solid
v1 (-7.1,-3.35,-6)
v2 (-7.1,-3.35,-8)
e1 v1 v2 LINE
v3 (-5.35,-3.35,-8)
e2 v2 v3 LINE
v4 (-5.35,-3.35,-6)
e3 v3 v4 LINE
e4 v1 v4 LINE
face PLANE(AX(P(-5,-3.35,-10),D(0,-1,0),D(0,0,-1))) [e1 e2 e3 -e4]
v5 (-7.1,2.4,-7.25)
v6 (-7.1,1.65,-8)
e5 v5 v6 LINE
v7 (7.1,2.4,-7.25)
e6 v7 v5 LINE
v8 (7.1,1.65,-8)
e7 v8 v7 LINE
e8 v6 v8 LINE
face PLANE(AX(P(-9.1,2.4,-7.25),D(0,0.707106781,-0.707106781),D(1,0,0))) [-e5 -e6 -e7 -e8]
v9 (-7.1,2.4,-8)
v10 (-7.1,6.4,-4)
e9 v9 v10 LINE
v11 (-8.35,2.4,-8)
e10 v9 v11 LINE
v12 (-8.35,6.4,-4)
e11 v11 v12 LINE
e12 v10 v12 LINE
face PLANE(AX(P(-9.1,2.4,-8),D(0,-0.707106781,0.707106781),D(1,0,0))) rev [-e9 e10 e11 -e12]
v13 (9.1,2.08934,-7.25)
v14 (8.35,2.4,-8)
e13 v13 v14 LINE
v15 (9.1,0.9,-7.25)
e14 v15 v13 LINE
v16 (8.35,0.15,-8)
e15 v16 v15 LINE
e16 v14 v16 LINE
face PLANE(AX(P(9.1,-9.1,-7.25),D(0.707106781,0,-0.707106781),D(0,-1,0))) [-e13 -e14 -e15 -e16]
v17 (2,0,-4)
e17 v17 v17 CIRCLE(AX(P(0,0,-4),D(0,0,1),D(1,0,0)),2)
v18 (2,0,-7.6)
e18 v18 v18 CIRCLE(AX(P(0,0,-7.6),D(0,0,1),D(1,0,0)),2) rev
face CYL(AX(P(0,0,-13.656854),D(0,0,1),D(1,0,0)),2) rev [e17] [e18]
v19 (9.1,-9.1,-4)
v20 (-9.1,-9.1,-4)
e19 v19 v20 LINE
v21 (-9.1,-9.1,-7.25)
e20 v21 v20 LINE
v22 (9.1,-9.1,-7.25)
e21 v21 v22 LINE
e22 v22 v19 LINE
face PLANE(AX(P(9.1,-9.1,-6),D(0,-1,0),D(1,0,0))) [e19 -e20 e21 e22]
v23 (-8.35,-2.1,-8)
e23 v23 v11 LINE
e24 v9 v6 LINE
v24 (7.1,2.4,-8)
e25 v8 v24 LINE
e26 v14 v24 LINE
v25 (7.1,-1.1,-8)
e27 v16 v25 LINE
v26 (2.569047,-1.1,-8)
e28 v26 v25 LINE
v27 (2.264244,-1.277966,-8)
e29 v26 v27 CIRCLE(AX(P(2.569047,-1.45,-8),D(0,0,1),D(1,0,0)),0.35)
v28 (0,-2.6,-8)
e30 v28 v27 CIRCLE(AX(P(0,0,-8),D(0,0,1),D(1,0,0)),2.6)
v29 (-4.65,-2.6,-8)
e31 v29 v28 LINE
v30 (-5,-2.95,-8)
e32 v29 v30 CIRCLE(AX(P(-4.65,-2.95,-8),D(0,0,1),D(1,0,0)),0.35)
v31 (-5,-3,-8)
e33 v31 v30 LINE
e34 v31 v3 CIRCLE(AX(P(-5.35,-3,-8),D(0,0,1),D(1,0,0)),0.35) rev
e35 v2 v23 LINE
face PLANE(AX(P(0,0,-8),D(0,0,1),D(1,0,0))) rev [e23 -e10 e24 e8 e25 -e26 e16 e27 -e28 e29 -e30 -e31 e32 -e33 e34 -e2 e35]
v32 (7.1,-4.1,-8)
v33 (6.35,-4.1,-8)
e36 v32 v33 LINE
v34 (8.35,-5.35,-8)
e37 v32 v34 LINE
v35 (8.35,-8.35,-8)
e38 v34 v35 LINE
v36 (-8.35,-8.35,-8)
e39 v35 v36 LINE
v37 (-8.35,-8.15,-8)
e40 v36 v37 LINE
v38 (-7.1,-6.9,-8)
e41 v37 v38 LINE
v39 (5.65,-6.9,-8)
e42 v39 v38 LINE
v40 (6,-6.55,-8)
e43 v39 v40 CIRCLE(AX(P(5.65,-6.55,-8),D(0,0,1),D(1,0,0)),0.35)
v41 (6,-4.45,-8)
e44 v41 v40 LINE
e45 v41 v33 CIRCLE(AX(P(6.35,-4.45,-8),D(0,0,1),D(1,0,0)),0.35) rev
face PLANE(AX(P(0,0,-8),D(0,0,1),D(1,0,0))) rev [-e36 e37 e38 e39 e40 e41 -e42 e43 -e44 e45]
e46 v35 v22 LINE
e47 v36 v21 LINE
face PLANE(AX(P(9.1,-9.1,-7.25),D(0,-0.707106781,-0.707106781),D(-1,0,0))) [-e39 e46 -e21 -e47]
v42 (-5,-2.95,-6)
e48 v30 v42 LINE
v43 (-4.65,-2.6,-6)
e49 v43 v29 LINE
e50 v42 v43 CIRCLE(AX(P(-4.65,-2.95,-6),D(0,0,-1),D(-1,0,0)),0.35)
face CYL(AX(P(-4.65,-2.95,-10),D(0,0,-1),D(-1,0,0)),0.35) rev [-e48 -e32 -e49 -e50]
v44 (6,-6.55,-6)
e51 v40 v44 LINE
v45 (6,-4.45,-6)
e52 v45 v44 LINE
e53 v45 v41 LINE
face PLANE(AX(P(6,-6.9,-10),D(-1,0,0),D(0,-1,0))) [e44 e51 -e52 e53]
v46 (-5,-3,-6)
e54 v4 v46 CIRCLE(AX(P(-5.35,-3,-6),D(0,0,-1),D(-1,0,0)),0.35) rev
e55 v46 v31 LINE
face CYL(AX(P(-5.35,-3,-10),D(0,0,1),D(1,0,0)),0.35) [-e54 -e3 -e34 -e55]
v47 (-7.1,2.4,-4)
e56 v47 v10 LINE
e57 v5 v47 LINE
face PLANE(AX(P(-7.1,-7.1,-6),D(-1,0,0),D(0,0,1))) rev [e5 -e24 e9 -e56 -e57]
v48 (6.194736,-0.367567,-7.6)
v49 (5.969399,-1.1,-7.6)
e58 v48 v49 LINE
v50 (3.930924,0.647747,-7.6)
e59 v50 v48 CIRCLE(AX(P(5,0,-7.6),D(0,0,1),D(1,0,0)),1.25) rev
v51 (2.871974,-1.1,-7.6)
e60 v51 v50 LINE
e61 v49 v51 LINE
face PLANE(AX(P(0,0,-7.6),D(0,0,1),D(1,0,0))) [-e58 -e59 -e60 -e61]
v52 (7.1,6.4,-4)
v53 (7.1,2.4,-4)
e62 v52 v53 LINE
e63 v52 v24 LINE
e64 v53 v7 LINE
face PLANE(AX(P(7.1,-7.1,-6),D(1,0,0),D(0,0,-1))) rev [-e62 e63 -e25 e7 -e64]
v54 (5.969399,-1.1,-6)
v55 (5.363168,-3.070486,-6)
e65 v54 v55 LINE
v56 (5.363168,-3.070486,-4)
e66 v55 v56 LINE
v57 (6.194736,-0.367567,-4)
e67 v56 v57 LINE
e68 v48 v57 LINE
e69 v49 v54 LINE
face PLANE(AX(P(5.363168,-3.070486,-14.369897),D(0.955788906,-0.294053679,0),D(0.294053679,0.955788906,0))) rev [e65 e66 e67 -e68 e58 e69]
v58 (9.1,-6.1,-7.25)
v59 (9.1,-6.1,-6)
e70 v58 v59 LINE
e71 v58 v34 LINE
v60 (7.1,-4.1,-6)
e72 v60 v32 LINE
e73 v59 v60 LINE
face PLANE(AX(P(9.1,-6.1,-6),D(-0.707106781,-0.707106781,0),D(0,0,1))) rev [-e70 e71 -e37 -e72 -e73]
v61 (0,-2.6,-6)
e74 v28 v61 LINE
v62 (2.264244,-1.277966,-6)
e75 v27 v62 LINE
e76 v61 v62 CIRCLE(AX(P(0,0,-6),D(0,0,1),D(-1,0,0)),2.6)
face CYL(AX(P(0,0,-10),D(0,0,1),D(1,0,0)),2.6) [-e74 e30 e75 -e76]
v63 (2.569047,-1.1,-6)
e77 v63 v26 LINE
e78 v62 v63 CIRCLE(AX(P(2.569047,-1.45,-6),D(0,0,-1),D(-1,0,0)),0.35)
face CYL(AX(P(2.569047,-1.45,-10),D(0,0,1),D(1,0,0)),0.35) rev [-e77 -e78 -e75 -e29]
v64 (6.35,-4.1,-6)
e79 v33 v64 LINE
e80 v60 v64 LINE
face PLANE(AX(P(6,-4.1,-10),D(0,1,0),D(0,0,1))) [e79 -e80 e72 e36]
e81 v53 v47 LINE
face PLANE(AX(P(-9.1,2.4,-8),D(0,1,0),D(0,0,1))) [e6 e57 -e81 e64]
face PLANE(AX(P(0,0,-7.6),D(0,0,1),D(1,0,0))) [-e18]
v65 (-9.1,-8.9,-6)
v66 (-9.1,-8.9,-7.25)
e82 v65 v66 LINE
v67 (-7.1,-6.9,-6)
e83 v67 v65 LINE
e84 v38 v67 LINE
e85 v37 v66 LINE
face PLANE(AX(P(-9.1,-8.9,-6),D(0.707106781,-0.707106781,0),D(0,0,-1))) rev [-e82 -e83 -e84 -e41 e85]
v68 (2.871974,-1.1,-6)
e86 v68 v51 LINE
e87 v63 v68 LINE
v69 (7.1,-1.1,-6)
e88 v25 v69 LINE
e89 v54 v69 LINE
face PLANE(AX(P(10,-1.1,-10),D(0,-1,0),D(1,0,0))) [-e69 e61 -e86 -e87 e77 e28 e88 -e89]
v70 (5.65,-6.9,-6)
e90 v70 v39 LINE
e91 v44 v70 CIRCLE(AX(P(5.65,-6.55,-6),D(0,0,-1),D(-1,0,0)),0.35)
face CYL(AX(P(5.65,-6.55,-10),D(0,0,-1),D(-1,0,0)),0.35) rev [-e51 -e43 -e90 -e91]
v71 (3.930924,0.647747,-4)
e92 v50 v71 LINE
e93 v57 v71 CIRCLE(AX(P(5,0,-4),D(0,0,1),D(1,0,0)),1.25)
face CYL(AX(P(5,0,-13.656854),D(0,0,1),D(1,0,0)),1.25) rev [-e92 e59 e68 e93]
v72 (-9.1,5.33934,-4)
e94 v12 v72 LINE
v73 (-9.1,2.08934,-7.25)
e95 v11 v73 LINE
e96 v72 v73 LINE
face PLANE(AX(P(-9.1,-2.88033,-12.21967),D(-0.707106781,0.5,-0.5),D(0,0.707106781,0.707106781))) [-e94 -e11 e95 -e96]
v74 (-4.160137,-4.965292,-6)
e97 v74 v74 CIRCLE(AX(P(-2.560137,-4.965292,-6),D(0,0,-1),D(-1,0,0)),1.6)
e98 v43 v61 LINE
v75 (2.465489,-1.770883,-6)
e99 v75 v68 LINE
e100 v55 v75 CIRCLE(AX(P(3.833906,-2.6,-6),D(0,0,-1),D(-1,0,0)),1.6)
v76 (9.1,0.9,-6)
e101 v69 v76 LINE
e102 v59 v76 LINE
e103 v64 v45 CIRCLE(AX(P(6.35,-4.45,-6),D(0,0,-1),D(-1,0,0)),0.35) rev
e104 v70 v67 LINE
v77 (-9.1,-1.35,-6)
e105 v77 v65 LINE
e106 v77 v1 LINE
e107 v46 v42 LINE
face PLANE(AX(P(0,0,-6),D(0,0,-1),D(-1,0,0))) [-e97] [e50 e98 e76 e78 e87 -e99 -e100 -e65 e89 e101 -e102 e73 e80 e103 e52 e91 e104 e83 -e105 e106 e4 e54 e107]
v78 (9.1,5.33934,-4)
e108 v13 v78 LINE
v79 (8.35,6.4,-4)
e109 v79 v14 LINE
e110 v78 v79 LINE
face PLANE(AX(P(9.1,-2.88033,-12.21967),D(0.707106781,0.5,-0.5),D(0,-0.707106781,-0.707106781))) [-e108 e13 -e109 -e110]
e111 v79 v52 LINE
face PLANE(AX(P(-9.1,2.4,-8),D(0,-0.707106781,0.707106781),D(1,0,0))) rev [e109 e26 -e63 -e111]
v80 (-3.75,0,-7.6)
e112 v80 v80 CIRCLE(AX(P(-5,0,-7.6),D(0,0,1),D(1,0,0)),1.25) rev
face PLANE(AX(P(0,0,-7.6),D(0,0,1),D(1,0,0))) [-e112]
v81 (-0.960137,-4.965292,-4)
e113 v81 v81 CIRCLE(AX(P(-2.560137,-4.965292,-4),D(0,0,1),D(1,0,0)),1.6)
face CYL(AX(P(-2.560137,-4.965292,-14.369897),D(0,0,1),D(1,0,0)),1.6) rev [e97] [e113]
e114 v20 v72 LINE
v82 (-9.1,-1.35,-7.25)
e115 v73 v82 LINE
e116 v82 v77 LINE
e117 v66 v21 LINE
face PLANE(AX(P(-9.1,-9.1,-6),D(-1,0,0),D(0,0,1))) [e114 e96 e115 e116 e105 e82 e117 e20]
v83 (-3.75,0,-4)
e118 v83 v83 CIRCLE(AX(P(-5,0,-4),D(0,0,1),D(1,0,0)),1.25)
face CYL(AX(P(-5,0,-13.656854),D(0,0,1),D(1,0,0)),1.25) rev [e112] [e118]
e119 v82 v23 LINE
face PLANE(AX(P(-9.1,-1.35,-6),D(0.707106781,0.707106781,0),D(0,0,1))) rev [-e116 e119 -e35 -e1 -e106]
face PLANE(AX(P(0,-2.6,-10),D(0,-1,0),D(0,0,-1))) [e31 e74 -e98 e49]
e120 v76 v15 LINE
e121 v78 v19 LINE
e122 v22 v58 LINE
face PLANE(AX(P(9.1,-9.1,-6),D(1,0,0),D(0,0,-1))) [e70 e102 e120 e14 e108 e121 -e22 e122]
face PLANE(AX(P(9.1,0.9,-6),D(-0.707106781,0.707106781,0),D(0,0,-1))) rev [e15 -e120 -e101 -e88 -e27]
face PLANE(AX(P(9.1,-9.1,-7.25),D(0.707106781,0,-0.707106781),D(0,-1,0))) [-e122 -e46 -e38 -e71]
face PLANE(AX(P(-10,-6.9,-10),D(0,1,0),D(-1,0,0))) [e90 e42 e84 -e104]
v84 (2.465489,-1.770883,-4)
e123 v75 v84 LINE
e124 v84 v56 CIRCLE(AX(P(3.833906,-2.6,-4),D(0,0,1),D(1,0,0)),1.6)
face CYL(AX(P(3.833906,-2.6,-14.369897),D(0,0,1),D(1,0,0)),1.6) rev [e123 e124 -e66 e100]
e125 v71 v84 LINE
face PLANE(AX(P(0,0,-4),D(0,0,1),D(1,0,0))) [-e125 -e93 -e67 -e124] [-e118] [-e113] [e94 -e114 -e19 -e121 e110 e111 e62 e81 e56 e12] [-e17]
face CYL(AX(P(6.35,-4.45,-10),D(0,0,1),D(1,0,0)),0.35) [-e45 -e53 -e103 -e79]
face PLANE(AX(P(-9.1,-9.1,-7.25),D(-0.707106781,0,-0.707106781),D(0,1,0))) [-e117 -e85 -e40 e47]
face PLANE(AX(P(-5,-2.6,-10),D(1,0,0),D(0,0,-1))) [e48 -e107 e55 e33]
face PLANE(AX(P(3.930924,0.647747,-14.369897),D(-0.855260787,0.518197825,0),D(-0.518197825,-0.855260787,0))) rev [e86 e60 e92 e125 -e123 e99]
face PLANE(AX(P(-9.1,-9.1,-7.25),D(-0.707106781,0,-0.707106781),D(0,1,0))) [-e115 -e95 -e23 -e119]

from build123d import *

# Parameters (mm, degrees)
OUTER_FRAME_EXTRUDE_DEPTH      = 4
OUTER_FRAME_EXTRUDE_DEPTH_BACK = 2
OUTSIDE_FRAME_W                = 18.2
OUTSIDE_FRAME_H                = 18.2
OUTSIDE_FRAME_W_2              = 14.2
OUTSIDE_FRAME_H_2              = 14.2
HOTSWAP_BASE_W                 = 18.2
HOTSWAP_BASE_H                 = 11.5
HOTSWAP_BASE_BLOCK_DEPTH       = 4
CUT_EXTRUDE4_DEPTH             = 16.15321748
CUT_EXTRUDE4_DEPTH_BACK        = 16.15321748
SKETCH1_W                      = 2
SKETCH1_H                      = 6.7
CUT_EXTRUDE1_DEPTH             = 4
SWITCH_PIN_HOLES_R             = 2
SWITCH_PIN_HOLES_R_2           = 1.25
SWITCH_HOLES_DEPTH             = 3.6
CUT_EXTRUDE3_REACH             = 17.153
HOTSWAP_HOLES_R                = 1.6
CHAMFER1_SIZE                  = 2
CHAMFER2_SIZE                  = 4
FILLET1_R                      = 0.35
CHAMFER3_SIZE                  = 0.75


# Some blends are built 0.0001 mm under size
with BuildPart() as part:
    # Outside Frame → Outer Frame Extrude (new, two sides: drawn at the far end of the back side and taken through both)
    with BuildSketch(Plane.XY.offset(-4).offset(-OUTER_FRAME_EXTRUDE_DEPTH_BACK)):
        Rectangle(OUTSIDE_FRAME_W, OUTSIDE_FRAME_H)
        Rectangle(OUTSIDE_FRAME_W_2, OUTSIDE_FRAME_H_2, mode=Mode.SUBTRACT)
    extrude(amount=OUTER_FRAME_EXTRUDE_DEPTH + OUTER_FRAME_EXTRUDE_DEPTH_BACK)

    # Hotswap Base → Hotswap Base Block (add)
    with BuildSketch(Plane.XY.offset(-4)):
        with Locations((0, -3.35)):
            Rectangle(HOTSWAP_BASE_W, HOTSWAP_BASE_H)
    extrude(amount=-HOTSWAP_BASE_BLOCK_DEPTH)

    # Sketch1 → Cut-Extrude4 (cut, two sides: drawn at the far end of the back side and taken through both)
    with BuildSketch(Plane(origin=(0, 0, 0), x_dir=(0, 0, -1), z_dir=(1, 0, 0)).offset(-CUT_EXTRUDE4_DEPTH_BACK)):
        with Locations((5, 5.75)):
            Rectangle(SKETCH1_W, SKETCH1_H)
    extrude(amount=CUT_EXTRUDE4_DEPTH + CUT_EXTRUDE4_DEPTH_BACK, mode=Mode.SUBTRACT)

    # Hotswap Well → Cut-Extrude1 (cut)
    with BuildSketch(Plane(origin=(0, 0, -6), x_dir=(-1, 0, 0), z_dir=(0, 0, -1))):
        with BuildLine():
            Line((-10, -1.1), (-2.355843798, -1.1))
            ThreePointArc((-2.355843798, -1.1), (-1.396424004, -2.19317122), (0, -2.6))
            Line((0, -2.6), (5, -2.6))
            Line((5, -2.6), (5, -3.35))
            Line((5, -3.35), (10, -3.35))
            Line((10, -3.35), (10, -6.9))
            Line((10, -6.9), (-6, -6.9))
            Line((-6, -6.9), (-6, -4.1))
            Line((-6, -4.1), (-10, -4.1))
            Line((-10, -4.1), (-10, -1.1))
        make_face()
    extrude(amount=CUT_EXTRUDE1_DEPTH, mode=Mode.SUBTRACT)

    # Switch Pin Holes → Switch Holes (cut)
    with BuildSketch(Plane.XY.offset(-4)):
        Circle(SWITCH_PIN_HOLES_R)
        with Locations((-5, 0)):
            Circle(SWITCH_PIN_HOLES_R_2)
        with Locations((5, 0)):
            Circle(SWITCH_PIN_HOLES_R_2)
    extrude(amount=-SWITCH_HOLES_DEPTH, mode=Mode.SUBTRACT)

    # Cut-Extrude3: up to this face of the body (flat: up to its plane)
    cut_extrude3_end = Plane(part.part.faces().sort_by_distance((5, 0.029137252, -7.6))[0])
    # Hotswap Holes → Cut-Extrude3 (cut, up to the picked face)
    with BuildSketch(Plane.XY, mode=Mode.PRIVATE) as cut_extrude3_sk1:
        with Locations((-2.560136595, -4.965291588)):
            Circle(HOTSWAP_HOLES_R)
    cut_extrude3_tool1 = split(extrude(cut_extrude3_sk1.sketch, amount=-CUT_EXTRUDE3_REACH, mode=Mode.PRIVATE), bisect_by=cut_extrude3_end, keep=Keep.BOTH, mode=Mode.PRIVATE)
    # Hotswap Holes → Cut-Extrude3 (cut, up to the picked face)
    with BuildSketch(Plane.XY, mode=Mode.PRIVATE) as cut_extrude3_sk2:
        with BuildLine():
            Line((3.930924016, 0.647747281), (2.46548889, -1.77088348))
            ThreePointArc((2.46548889, -1.77088348), (3.179147124, -4.059894044), (5.3631684, -3.070485887))
            Line((5.3631684, -3.070485887), (6.194736133, -0.367567099))
            ThreePointArc((6.194736133, -0.367567099), (5.511530489, 1.140542222), (3.930924016, 0.647747281))
        make_face()
    cut_extrude3_tool2 = split(extrude(cut_extrude3_sk2.sketch, amount=-CUT_EXTRUDE3_REACH, mode=Mode.PRIVATE), bisect_by=cut_extrude3_end, keep=Keep.BOTH, mode=Mode.PRIVATE)
    add(cut_extrude3_tool1.solids().sort_by(Axis((-2.560137, -4.965292, 0), (0, 0, -1)))[0], mode=Mode.SUBTRACT)
    add(cut_extrude3_tool2.solids().sort_by(Axis((4.301523, -1.557372, 0), (0, 0, -1)))[0], mode=Mode.SUBTRACT)

    # Chamfer1
    chamfer1_edges = [part.edges().sort_by_distance(p)[0] for p in [
        (9.1, -4.1, -7),
        (-9.1, -6.9, -7),
        (-9.1, -3.35, -7),
        (9.1, -1.1, -7),
    ]]
    chamfer(chamfer1_edges, length=CHAMFER1_SIZE)

    # Chamfer2
    chamfer2_edges = [part.edges().sort_by_distance(p)[0] for p in [
        (-8.1, 2.4, -4),
        (8.1, 2.4, -4),
    ]]
    chamfer(chamfer2_edges, length=CHAMFER2_SIZE - 0.0001)  # a hair under: the kernel refuses the full size

    # Fillet1
    fillet1_edges = [part.edges().sort_by_distance(p)[0] for p in [
        (6, -4.1, -7),
        (-5, -3.35, -7),
        (-5, -2.6, -7),
        (6, -6.9, -7),
        (2.355843798, -1.1, -7),
    ]]
    fillet(fillet1_edges, radius=FILLET1_R)

    # Chamfer3
    # the kernel refuses this chamfer: 0.75 mm, written as the material it takes off along each edge
    with BuildSketch(Plane(origin=(9.1, 4.328762241, -8), x_dir=(-0.9996219169112965, 0, -0.02749587661058676), z_dir=(0, -1, 0))) as chamfer3_piece_1:
        Polygon((CHAMFER3_SIZE * 0.999621916911, -CHAMFER3_SIZE * 0.0274958766106), (-CHAMFER3_SIZE * 0.0274958766106, -CHAMFER3_SIZE * 0.999621916911), (0, 0), align=None)
    extrude(amount=5.357524482, mode=Mode.SUBTRACT)
    with BuildSketch(Plane(origin=(-9.1, -3.278762241, -8), x_dir=(0.9996219169112965, 0, -0.02749587661058676), z_dir=(0, 1, 0))) as chamfer3_piece_2:
        Polygon((CHAMFER3_SIZE * 0.999621916911, -CHAMFER3_SIZE * 0.0274958766106), (-CHAMFER3_SIZE * 0.0274958766106, -CHAMFER3_SIZE * 0.999621916911), (0, 0), align=None)
    extrude(amount=7.607524482, mode=Mode.SUBTRACT)
    with BuildSketch(Plane(origin=(-9.1, -11.028762241, -8), x_dir=(-0.027495876610586768, 0, 0.9996219169112968), z_dir=(0, 1, 0))) as chamfer3_piece_3:
        Polygon((CHAMFER3_SIZE * 0.999621916911, CHAMFER3_SIZE * 0.0274958766106), (-CHAMFER3_SIZE * 0.0274958766106, CHAMFER3_SIZE * 0.999621916911), (0, 0), align=None)
    extrude(amount=4.057524482, mode=Mode.SUBTRACT)
    with BuildSketch(Plane(origin=(9.1, -4.171237759, -8), x_dir=(0.027495876610586768, 0, 0.9996219169112968), z_dir=(0, -1, 0))) as chamfer3_piece_4:
        Polygon((CHAMFER3_SIZE * 0.999621916911, CHAMFER3_SIZE * 0.0274958766106), (-CHAMFER3_SIZE * 0.0274958766106, CHAMFER3_SIZE * 0.999621916911), (0, 0), align=None)
    extrude(amount=6.857524482, mode=Mode.SUBTRACT)
    with BuildSketch(Plane(origin=(11.028762241, -9.1, -8), x_dir=(0, -0.027495876610586768, 0.9996219169112968), z_dir=(-1, 0, 0))) as chamfer3_piece_5:
        Polygon((CHAMFER3_SIZE * 0.999621916911, CHAMFER3_SIZE * 0.0274958766106), (-CHAMFER3_SIZE * 0.0274958766106, CHAMFER3_SIZE * 0.999621916911), (0, 0), align=None)
    extrude(amount=22.057524482, mode=Mode.SUBTRACT)
    with BuildSketch(Plane(origin=(-11.028762241, 2.4, -8), x_dir=(0, -0.9996219169112968, -0.027495876610586775), z_dir=(1, 0, 0))) as chamfer3_piece_6_section:
        Polygon((CHAMFER3_SIZE * 0.999621916911, -CHAMFER3_SIZE * 0.0274958766106), (-CHAMFER3_SIZE * 0.0274958766106, -CHAMFER3_SIZE * 0.999621916911), (0, 0), align=None)
    chamfer3_piece_6 = extrude(amount=22.057524482, mode=Mode.PRIVATE)
    chamfer3_piece_6 = split(chamfer3_piece_6, bisect_by=Plane(origin=(7.1, 2.149999996, -7.749999996), z_dir=(-1, 0, 0)), keep=Keep.TOP, mode=Mode.PRIVATE)
    chamfer3_piece_6 = split(chamfer3_piece_6, bisect_by=Plane(origin=(-7.1, 2.149999996, -7.749999996), z_dir=(1, 0, 0)), keep=Keep.TOP, mode=Mode.PRIVATE)
    add(chamfer3_piece_6, mode=Mode.SUBTRACT)
    with BuildSketch(Plane(origin=(9.1, 7.76374086, -2.63615914), x_dir=(0.02749587661058679, -0.7068394360706739, 0.706839436070673), z_dir=(0, -0.7071067811865471, -0.7071067811865479))) as chamfer3_piece_7_section:
        Polygon((CHAMFER3_SIZE * 0.999621916911, CHAMFER3_SIZE * 0.0274958766106), (-CHAMFER3_SIZE * 0.0274958766106, CHAMFER3_SIZE * 0.999621916911), (0, 0), align=None)
    chamfer3_piece_7 = extrude(amount=9.51423731, mode=Mode.PRIVATE)
    chamfer3_piece_7 = split(chamfer3_piece_7, bisect_by=Plane(origin=(8.843939938, 4.231743527, -4), z_dir=(0, 0, -1)), keep=Keep.TOP, mode=Mode.PRIVATE)
    add(chamfer3_piece_7, mode=Mode.SUBTRACT)
    with BuildSketch(Plane(origin=(-9.1, 7.76374086, -2.63615914), x_dir=(-0.027495876610586768, -0.7068394360706739, 0.706839436070673), z_dir=(0, -0.7071067811865471, -0.7071067811865479))) as chamfer3_piece_8_section:
        Polygon((CHAMFER3_SIZE * 0.999621916911, -CHAMFER3_SIZE * 0.0274958766106), (-CHAMFER3_SIZE * 0.0274958766106, -CHAMFER3_SIZE * 0.999621916911), (0, 0), align=None)
    chamfer3_piece_8 = extrude(amount=9.51423731, mode=Mode.PRIVATE)
    chamfer3_piece_8 = split(chamfer3_piece_8, bisect_by=Plane(origin=(-8.843939938, 4.231743527, -4), z_dir=(0, 0, -1)), keep=Keep.TOP, mode=Mode.PRIVATE)
    add(chamfer3_piece_8, mode=Mode.SUBTRACT)

    # Split1
    split(bisect_by=Plane.XY.offset(-4), keep=Keep.BOTTOM)


solid = part.part
